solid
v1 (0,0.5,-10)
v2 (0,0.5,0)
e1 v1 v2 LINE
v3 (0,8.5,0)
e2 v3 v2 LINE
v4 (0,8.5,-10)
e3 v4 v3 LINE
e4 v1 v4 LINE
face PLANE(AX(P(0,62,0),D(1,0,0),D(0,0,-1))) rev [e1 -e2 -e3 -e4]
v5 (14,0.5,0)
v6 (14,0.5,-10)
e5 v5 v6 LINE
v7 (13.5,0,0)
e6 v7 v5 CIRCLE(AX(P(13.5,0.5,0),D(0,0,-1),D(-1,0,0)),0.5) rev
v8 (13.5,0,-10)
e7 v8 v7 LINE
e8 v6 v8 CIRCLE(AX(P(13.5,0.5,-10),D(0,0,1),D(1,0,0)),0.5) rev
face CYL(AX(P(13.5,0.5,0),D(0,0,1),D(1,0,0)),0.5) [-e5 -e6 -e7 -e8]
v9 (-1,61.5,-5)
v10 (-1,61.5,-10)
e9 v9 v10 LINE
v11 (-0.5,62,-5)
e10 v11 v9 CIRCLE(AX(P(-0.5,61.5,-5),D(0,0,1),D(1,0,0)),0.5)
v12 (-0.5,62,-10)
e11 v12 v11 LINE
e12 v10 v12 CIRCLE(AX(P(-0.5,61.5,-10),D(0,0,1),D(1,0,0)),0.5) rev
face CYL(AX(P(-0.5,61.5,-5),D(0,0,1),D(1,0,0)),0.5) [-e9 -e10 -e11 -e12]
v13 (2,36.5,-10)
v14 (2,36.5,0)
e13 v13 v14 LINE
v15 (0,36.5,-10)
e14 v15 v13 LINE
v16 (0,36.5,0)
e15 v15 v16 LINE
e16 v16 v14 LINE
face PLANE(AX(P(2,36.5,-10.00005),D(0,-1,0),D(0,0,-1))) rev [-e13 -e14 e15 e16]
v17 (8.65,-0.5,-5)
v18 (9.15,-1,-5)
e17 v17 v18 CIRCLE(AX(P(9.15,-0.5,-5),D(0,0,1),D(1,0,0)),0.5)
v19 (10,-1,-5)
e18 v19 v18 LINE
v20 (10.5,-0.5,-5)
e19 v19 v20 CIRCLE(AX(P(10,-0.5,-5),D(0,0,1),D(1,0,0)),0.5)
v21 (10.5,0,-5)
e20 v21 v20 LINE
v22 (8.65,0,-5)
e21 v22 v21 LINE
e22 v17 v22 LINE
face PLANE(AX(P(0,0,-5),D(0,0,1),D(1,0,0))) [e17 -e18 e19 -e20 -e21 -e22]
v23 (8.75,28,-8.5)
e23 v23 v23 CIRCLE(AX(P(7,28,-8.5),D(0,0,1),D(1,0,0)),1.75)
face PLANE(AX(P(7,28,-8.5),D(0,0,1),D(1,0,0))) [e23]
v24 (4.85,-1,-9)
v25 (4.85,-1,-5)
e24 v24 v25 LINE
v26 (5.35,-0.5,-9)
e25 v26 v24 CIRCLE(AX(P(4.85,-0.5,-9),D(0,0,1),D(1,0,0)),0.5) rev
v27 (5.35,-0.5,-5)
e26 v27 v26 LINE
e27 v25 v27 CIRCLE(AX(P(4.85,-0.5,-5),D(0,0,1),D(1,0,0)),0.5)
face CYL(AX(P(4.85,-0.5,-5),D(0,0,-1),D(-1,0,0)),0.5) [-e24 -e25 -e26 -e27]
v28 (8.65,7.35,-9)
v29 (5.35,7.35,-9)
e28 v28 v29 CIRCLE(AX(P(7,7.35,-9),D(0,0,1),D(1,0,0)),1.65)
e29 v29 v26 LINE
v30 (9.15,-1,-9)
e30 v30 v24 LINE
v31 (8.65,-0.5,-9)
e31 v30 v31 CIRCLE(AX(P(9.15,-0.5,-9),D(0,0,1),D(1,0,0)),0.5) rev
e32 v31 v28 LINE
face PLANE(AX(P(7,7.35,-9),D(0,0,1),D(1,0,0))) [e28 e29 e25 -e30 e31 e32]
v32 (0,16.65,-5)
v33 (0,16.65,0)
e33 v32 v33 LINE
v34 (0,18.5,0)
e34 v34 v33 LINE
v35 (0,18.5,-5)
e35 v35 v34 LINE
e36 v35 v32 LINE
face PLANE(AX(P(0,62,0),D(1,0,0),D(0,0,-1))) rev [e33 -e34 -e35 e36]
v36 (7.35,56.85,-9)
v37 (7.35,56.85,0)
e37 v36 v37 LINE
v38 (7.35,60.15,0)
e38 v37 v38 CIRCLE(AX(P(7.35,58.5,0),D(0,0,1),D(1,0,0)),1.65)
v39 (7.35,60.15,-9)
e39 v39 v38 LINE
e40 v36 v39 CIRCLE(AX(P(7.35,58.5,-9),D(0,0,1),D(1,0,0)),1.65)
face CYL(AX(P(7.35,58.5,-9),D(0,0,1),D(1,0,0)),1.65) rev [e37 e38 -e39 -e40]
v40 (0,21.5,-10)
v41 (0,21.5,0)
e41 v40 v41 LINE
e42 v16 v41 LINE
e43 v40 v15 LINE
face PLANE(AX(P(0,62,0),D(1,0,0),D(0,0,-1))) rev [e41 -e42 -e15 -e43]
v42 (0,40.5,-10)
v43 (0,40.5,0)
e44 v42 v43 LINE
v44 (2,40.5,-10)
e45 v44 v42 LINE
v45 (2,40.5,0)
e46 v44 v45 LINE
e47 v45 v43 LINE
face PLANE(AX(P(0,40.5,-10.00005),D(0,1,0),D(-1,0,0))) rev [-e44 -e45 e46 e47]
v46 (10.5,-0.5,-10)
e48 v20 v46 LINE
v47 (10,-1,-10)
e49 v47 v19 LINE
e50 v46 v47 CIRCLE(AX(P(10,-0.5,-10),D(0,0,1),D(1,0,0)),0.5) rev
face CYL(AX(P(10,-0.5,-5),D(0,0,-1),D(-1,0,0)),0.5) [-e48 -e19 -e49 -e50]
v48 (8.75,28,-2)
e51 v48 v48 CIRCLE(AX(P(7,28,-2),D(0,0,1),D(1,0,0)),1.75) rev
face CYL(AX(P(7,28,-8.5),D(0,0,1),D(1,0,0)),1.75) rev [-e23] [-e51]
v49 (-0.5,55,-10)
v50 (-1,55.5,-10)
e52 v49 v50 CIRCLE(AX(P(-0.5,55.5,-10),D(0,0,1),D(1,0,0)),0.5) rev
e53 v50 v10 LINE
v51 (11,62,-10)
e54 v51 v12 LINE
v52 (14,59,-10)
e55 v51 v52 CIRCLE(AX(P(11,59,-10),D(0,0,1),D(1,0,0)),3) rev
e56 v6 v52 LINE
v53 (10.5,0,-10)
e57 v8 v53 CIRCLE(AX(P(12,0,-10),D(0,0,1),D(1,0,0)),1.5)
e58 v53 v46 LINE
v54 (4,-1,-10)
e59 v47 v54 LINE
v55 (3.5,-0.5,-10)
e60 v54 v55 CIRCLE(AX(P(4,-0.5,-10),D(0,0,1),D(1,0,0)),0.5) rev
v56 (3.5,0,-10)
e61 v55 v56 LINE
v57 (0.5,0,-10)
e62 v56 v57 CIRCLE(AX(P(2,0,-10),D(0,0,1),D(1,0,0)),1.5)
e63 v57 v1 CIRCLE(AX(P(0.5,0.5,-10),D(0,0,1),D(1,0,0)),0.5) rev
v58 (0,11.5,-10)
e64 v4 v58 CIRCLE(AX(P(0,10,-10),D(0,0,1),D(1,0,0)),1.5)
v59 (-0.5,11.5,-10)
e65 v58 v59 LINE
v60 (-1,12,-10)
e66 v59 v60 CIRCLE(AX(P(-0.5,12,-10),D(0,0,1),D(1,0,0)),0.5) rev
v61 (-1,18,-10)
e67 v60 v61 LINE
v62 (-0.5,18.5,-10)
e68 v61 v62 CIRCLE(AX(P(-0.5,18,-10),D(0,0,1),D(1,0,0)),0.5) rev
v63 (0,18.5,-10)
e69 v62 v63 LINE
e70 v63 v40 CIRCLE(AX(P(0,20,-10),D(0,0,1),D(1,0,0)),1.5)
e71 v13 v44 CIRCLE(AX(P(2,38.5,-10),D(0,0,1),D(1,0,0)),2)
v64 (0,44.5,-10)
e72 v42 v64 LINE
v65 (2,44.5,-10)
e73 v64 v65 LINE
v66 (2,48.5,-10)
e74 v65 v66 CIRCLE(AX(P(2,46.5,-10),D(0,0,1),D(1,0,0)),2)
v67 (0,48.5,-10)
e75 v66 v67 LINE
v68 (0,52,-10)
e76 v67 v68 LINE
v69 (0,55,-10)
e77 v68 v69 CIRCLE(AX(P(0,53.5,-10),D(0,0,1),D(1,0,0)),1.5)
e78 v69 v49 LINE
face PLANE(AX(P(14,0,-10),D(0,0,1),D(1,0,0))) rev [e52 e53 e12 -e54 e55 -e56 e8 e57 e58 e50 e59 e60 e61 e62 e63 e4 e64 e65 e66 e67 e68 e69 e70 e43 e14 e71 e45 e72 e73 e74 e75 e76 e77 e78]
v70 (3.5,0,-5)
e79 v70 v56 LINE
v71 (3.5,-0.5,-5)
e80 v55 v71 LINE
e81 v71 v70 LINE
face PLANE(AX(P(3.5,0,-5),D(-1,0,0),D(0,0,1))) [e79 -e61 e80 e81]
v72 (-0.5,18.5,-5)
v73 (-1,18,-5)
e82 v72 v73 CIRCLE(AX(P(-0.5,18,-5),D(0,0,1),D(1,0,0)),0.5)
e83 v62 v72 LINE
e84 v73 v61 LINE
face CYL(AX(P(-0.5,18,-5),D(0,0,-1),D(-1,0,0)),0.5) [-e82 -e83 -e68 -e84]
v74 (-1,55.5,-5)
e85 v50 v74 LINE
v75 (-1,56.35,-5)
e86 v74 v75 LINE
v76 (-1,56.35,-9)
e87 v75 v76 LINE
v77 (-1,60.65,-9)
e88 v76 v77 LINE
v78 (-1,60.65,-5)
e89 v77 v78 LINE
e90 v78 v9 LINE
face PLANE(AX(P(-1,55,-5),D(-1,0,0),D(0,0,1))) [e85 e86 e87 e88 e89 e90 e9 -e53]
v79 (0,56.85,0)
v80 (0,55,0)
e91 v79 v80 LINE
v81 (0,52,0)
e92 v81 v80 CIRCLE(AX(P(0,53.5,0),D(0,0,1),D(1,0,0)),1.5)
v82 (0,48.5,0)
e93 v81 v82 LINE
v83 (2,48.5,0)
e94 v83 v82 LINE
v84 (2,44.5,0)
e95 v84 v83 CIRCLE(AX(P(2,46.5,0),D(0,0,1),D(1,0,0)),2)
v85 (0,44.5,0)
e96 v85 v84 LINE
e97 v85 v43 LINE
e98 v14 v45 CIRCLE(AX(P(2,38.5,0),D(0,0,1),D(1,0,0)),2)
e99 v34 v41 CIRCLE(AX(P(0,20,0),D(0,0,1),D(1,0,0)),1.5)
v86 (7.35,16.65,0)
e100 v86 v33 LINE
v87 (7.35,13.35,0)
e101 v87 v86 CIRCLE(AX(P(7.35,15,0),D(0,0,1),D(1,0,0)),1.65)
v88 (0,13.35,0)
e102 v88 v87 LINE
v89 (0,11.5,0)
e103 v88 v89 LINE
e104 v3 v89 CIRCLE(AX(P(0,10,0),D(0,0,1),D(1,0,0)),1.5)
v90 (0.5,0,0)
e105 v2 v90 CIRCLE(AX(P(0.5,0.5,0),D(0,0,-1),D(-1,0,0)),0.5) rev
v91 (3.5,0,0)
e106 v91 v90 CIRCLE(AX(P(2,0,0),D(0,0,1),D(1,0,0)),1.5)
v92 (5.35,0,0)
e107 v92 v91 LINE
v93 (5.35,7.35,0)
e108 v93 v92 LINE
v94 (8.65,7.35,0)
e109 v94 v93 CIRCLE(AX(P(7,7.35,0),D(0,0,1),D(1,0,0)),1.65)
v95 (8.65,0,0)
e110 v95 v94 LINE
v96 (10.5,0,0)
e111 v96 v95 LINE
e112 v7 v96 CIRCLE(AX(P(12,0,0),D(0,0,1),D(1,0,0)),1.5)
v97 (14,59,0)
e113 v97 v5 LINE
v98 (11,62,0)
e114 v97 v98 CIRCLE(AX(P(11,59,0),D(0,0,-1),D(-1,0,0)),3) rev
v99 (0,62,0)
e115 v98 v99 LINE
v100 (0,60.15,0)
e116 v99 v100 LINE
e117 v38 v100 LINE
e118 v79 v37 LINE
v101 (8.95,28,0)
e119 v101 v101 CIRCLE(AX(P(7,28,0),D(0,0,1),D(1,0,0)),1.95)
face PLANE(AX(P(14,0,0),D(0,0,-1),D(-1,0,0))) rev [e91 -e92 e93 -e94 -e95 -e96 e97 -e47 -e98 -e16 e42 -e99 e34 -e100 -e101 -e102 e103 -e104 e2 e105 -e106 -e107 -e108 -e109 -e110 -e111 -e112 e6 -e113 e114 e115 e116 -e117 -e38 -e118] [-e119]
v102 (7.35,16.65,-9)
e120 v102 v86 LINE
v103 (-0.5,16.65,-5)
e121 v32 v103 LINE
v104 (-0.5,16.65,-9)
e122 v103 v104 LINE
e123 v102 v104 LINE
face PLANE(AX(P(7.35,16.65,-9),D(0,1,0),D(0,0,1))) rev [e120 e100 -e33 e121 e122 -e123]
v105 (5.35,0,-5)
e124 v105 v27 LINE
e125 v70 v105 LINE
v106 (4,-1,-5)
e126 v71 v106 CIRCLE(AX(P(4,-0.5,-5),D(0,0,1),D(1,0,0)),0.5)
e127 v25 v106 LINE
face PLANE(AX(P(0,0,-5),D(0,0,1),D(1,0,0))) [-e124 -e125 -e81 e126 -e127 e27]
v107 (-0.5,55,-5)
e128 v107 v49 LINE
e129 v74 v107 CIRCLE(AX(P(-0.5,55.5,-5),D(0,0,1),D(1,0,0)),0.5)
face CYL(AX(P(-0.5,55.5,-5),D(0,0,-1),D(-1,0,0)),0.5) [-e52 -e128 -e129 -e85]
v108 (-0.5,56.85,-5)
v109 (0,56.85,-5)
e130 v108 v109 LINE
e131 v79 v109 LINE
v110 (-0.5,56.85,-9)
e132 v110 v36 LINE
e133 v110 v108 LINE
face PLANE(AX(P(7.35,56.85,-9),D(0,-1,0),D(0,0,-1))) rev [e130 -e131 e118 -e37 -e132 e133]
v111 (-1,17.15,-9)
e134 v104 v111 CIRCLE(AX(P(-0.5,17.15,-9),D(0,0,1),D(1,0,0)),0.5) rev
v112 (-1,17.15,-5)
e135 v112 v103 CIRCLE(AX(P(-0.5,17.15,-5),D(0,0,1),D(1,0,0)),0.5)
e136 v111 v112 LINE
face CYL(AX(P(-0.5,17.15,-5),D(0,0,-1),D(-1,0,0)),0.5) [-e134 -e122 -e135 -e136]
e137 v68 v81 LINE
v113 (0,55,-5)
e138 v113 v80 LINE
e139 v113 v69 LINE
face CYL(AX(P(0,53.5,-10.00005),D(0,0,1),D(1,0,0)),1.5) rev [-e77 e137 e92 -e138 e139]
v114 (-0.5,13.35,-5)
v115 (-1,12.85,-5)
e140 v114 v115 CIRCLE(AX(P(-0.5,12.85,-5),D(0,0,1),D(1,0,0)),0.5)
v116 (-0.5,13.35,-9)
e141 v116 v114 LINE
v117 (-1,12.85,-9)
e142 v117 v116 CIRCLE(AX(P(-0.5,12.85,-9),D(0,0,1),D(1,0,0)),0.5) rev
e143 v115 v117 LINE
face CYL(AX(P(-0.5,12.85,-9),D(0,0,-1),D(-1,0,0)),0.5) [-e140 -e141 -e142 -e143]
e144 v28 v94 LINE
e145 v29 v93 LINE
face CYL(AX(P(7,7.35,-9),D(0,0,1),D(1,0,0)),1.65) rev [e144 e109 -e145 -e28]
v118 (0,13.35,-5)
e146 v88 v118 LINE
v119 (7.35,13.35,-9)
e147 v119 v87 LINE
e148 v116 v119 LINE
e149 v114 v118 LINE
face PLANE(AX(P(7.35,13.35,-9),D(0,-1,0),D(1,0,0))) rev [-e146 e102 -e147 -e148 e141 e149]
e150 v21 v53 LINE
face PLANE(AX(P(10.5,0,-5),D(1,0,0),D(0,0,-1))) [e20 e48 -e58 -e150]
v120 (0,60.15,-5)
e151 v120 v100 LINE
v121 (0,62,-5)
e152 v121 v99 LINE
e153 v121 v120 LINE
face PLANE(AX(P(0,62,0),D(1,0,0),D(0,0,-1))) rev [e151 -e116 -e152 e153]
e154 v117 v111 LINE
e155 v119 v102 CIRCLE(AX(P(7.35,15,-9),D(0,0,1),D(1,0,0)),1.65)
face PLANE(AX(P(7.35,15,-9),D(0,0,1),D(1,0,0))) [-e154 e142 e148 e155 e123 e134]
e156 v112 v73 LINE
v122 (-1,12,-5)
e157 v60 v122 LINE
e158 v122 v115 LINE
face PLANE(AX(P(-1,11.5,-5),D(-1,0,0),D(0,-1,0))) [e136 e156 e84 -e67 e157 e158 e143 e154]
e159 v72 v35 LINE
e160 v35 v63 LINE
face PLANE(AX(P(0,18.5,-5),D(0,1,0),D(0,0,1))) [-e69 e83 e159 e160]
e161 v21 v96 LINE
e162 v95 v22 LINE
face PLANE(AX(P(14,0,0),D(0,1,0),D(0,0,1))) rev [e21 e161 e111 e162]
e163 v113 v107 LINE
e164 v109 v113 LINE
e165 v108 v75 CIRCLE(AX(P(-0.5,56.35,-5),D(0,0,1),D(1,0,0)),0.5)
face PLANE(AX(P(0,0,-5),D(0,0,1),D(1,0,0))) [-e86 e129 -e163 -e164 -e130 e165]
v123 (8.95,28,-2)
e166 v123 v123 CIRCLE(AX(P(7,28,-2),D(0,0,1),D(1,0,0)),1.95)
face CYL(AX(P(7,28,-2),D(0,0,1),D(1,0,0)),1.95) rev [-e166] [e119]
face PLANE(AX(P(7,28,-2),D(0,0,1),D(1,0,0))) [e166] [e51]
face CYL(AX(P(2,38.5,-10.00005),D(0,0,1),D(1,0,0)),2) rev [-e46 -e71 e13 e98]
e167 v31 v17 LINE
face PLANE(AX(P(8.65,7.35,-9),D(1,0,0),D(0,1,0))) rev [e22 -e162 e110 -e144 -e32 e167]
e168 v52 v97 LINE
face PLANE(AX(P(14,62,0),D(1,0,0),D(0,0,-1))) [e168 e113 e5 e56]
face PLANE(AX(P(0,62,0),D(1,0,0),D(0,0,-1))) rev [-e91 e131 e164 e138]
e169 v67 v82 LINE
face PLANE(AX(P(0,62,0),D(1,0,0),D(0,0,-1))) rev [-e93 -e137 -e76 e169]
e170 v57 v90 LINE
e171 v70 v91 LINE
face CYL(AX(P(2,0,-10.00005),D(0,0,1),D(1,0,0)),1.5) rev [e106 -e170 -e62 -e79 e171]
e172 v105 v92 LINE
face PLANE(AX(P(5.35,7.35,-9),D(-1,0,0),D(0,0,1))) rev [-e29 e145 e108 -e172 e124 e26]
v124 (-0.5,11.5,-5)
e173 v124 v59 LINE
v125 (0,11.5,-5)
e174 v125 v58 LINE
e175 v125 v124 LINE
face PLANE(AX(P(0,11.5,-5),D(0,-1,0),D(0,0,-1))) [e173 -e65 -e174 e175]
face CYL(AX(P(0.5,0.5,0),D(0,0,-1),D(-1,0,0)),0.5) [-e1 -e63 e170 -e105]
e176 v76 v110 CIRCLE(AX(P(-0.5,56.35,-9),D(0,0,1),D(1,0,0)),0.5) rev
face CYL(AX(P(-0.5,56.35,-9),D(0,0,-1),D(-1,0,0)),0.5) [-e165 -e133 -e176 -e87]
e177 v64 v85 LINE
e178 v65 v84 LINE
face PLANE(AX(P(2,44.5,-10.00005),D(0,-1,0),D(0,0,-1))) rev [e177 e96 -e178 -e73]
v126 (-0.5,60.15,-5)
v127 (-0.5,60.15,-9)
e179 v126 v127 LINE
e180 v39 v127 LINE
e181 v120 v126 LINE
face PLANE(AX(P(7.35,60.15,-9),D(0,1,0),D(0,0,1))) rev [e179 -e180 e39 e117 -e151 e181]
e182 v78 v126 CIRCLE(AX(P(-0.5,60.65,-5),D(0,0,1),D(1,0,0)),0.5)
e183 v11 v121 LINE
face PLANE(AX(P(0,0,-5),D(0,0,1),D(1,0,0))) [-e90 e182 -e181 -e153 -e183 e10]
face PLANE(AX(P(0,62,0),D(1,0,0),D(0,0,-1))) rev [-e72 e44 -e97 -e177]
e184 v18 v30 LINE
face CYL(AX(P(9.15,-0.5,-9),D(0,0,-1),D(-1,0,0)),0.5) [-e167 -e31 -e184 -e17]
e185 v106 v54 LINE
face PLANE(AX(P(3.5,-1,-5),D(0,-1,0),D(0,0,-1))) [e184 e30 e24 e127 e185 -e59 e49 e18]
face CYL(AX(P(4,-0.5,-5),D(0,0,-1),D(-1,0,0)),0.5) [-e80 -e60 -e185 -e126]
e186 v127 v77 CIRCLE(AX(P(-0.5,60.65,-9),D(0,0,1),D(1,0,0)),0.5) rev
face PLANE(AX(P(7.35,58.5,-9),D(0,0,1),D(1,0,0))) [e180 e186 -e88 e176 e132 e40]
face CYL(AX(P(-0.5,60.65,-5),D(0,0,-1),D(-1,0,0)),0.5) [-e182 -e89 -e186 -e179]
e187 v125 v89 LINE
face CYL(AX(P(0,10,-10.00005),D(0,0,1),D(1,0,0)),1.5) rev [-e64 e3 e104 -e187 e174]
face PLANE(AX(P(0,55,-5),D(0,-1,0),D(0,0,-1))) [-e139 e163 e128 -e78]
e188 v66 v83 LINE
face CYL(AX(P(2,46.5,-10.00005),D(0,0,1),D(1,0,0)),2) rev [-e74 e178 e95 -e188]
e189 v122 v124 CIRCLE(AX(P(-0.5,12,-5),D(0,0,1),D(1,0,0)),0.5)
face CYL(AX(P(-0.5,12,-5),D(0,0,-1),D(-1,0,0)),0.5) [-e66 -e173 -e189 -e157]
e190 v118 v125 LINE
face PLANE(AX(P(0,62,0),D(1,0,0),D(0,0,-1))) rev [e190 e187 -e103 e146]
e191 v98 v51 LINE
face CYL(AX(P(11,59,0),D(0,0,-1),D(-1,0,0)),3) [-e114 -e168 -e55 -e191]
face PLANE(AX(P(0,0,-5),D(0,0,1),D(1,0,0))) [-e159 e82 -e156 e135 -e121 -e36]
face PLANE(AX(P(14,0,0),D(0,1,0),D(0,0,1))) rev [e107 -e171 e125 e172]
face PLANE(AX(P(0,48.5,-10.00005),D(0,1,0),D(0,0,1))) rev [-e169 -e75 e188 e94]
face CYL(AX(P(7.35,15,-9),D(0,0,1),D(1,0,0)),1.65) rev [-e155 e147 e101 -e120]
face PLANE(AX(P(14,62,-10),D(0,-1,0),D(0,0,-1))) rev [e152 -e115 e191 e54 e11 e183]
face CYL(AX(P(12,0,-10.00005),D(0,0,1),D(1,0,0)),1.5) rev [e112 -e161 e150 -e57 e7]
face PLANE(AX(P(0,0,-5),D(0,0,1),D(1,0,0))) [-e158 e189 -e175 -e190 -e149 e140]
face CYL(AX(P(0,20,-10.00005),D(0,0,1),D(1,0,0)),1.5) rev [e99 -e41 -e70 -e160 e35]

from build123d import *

# Parameters (mm, degrees)
SKETCH4_W           = 10
SKETCH4_H           = 62
BOSS_EXTRUDE1_DEPTH = 14
SKETCH10_W          = 1
SKETCH10_H          = 7
SKETCH10_W_2        = 7
SKETCH10_H_2        = 1
BOSS_EXTRUDE2_DEPTH = 5
CUT_EXTRUDE2_DEPTH  = 65.342831769
CUT_EXTRUDE6_DEPTH  = 65.342831769
SKETCH11_R          = 1.75
CUT_EXTRUDE7_DEPTH  = 8.5
SKETCH12_R          = 1.95
CUT_EXTRUDE8_DEPTH  = 2
CUT_EXTRUDE9_DEPTH  = 9
FILLET1_R           = 3
FILLET3_R           = 0.5


with BuildPart() as part:
    # Sketch4 → Boss-Extrude1 (new body)
    with BuildSketch(Plane(origin=(0, 0, 0), x_dir=(0, 0, -1), z_dir=(1, 0, 0))):
        with Locations((5, 31)):
            Rectangle(SKETCH4_W, SKETCH4_H)
    extrude(amount=BOSS_EXTRUDE1_DEPTH)

    # Sketch10 → Boss-Extrude2 (add)
    with BuildSketch(Plane(origin=(0, 0, -10), x_dir=(-1, 0, 0), z_dir=(0, 0, -1))):
        with Locations((0.5, 15)):
            Rectangle(SKETCH10_W, SKETCH10_H)
        with Locations((0.5, 58.5)):
            Rectangle(SKETCH10_W, SKETCH10_H)
        with Locations((-7, -0.5)):
            Rectangle(SKETCH10_W_2, SKETCH10_H_2)
    extrude(amount=-BOSS_EXTRUDE2_DEPTH)

    # Sketch5 → Cut-Extrude2 (cut, through all)
    with BuildSketch(Plane.XY):
        with BuildLine():
            Line((2, 44.5), (0, 44.5))
            Line((0, 44.5), (0, 48.5))
            Line((0, 48.5), (2, 48.5))
            ThreePointArc((2, 48.5), (4, 46.5), (2, 44.5))
        make_face()
        with BuildLine():
            Line((2, 36.5), (0, 36.5))
            Line((0, 36.5), (0, 40.5))
            Line((0, 40.5), (2, 40.5))
            ThreePointArc((2, 40.5), (4, 38.5), (2, 36.5))
        make_face()
    extrude(amount=-CUT_EXTRUDE2_DEPTH, mode=Mode.SUBTRACT)

    # Sketch9 → Cut-Extrude6 (cut, through all)
    with BuildSketch(Plane.XY):
        with BuildLine():
            Line((0, 52), (-1, 52))
            ThreePointArc((-1, 52), (-2.5, 53.5), (-1, 55))
            Line((-1, 55), (0, 55))
            ThreePointArc((0, 55), (1.5, 53.5), (0, 52))
        make_face()
        with BuildLine():
            Line((0, 18.5), (-1, 18.5))
            ThreePointArc((-1, 18.5), (-2.5, 20), (-1, 21.5))
            Line((-1, 21.5), (0, 21.5))
            ThreePointArc((0, 21.5), (1.5, 20), (0, 18.5))
        make_face()
        with BuildLine():
            Line((0, 8.5), (-1, 8.5))
            ThreePointArc((-1, 8.5), (-2.5, 10), (-1, 11.5))
            Line((-1, 11.5), (0, 11.5))
            ThreePointArc((0, 11.5), (1.5, 10), (0, 8.5))
        make_face()
        with BuildLine():
            Line((0.5, -1), (0.5, 0))
            ThreePointArc((0.5, 0), (2, 1.5), (3.5, 0))
            Line((3.5, 0), (3.5, -1))
            ThreePointArc((3.5, -1), (2, -2.5), (0.5, -1))
        make_face()
        with BuildLine():
            Line((13.5, 0), (13.5, -1))
            ThreePointArc((13.5, -1), (12, -2.5), (10.5, -1))
            Line((10.5, -1), (10.5, 0))
            ThreePointArc((10.5, 0), (12, 1.5), (13.5, 0))
        make_face()
    extrude(amount=-CUT_EXTRUDE6_DEPTH, mode=Mode.SUBTRACT)

    # Sketch11 → Cut-Extrude7 (cut)
    with BuildSketch(Plane.XY):
        with Locations((7, 28)):
            Circle(SKETCH11_R)
    extrude(amount=-CUT_EXTRUDE7_DEPTH, mode=Mode.SUBTRACT)

    # Sketch12 → Cut-Extrude8 (cut)
    with BuildSketch(Plane.XY):
        with Locations((7, 28)):
            Circle(SKETCH12_R)
    extrude(amount=-CUT_EXTRUDE8_DEPTH, mode=Mode.SUBTRACT)

    # Sketch13 → Cut-Extrude9 (cut)
    with BuildSketch(Plane.XY):
        with BuildLine():
            Line((8.65, 7.35), (8.65, -1))
            ThreePointArc((8.65, -1), (7, -2.65), (5.35, -1))
            Line((5.35, -1), (5.35, 7.35))
            ThreePointArc((5.35, 7.35), (7, 9), (8.65, 7.35))
        make_face()
        with BuildLine():
            Line((7.35, 13.35), (-1, 13.35))
            ThreePointArc((-1, 13.35), (-2.65, 15), (-1, 16.65))
            Line((-1, 16.65), (7.35, 16.65))
            ThreePointArc((7.35, 16.65), (9, 15), (7.35, 13.35))
        make_face()
        with BuildLine():
            Line((7.35, 56.85), (-1, 56.85))
            ThreePointArc((-1, 56.85), (-2.65, 58.5), (-1, 60.15))
            Line((-1, 60.15), (7.35, 60.15))
            ThreePointArc((7.35, 60.15), (9, 58.5), (7.35, 56.85))
        make_face()
    extrude(amount=-CUT_EXTRUDE9_DEPTH, mode=Mode.SUBTRACT)

    # Fillet1
    fillet1_edges = [part.edges().sort_by_distance(p)[0] for p in [
        (14, 62, -5),
    ]]
    fillet(fillet1_edges, radius=FILLET1_R)

    # Fillet3
    fillet3_edges = [part.edges().sort_by_distance(p)[0] for p in [
        (14, 0, -5),
        (0, 0, -5),
        (-1, 55, -7.5),
        (-1, 62, -7.5),
        (-1, 18.5, -7.5),
        (-1, 11.5, -7.5),
        (3.5, -1, -7.5),
        (10.5, -1, -7.5),
        (-1, 56.85, -7),
        (-1, 60.15, -7),
        (-1, 13.35, -7),
        (-1, 16.65, -7),
        (5.35, -1, -7),
        (8.65, -1, -7),
    ]]
    fillet(fillet3_edges, radius=FILLET3_R - 0.0001)  # a hair under: the kernel refuses the full size


solid = part.part
